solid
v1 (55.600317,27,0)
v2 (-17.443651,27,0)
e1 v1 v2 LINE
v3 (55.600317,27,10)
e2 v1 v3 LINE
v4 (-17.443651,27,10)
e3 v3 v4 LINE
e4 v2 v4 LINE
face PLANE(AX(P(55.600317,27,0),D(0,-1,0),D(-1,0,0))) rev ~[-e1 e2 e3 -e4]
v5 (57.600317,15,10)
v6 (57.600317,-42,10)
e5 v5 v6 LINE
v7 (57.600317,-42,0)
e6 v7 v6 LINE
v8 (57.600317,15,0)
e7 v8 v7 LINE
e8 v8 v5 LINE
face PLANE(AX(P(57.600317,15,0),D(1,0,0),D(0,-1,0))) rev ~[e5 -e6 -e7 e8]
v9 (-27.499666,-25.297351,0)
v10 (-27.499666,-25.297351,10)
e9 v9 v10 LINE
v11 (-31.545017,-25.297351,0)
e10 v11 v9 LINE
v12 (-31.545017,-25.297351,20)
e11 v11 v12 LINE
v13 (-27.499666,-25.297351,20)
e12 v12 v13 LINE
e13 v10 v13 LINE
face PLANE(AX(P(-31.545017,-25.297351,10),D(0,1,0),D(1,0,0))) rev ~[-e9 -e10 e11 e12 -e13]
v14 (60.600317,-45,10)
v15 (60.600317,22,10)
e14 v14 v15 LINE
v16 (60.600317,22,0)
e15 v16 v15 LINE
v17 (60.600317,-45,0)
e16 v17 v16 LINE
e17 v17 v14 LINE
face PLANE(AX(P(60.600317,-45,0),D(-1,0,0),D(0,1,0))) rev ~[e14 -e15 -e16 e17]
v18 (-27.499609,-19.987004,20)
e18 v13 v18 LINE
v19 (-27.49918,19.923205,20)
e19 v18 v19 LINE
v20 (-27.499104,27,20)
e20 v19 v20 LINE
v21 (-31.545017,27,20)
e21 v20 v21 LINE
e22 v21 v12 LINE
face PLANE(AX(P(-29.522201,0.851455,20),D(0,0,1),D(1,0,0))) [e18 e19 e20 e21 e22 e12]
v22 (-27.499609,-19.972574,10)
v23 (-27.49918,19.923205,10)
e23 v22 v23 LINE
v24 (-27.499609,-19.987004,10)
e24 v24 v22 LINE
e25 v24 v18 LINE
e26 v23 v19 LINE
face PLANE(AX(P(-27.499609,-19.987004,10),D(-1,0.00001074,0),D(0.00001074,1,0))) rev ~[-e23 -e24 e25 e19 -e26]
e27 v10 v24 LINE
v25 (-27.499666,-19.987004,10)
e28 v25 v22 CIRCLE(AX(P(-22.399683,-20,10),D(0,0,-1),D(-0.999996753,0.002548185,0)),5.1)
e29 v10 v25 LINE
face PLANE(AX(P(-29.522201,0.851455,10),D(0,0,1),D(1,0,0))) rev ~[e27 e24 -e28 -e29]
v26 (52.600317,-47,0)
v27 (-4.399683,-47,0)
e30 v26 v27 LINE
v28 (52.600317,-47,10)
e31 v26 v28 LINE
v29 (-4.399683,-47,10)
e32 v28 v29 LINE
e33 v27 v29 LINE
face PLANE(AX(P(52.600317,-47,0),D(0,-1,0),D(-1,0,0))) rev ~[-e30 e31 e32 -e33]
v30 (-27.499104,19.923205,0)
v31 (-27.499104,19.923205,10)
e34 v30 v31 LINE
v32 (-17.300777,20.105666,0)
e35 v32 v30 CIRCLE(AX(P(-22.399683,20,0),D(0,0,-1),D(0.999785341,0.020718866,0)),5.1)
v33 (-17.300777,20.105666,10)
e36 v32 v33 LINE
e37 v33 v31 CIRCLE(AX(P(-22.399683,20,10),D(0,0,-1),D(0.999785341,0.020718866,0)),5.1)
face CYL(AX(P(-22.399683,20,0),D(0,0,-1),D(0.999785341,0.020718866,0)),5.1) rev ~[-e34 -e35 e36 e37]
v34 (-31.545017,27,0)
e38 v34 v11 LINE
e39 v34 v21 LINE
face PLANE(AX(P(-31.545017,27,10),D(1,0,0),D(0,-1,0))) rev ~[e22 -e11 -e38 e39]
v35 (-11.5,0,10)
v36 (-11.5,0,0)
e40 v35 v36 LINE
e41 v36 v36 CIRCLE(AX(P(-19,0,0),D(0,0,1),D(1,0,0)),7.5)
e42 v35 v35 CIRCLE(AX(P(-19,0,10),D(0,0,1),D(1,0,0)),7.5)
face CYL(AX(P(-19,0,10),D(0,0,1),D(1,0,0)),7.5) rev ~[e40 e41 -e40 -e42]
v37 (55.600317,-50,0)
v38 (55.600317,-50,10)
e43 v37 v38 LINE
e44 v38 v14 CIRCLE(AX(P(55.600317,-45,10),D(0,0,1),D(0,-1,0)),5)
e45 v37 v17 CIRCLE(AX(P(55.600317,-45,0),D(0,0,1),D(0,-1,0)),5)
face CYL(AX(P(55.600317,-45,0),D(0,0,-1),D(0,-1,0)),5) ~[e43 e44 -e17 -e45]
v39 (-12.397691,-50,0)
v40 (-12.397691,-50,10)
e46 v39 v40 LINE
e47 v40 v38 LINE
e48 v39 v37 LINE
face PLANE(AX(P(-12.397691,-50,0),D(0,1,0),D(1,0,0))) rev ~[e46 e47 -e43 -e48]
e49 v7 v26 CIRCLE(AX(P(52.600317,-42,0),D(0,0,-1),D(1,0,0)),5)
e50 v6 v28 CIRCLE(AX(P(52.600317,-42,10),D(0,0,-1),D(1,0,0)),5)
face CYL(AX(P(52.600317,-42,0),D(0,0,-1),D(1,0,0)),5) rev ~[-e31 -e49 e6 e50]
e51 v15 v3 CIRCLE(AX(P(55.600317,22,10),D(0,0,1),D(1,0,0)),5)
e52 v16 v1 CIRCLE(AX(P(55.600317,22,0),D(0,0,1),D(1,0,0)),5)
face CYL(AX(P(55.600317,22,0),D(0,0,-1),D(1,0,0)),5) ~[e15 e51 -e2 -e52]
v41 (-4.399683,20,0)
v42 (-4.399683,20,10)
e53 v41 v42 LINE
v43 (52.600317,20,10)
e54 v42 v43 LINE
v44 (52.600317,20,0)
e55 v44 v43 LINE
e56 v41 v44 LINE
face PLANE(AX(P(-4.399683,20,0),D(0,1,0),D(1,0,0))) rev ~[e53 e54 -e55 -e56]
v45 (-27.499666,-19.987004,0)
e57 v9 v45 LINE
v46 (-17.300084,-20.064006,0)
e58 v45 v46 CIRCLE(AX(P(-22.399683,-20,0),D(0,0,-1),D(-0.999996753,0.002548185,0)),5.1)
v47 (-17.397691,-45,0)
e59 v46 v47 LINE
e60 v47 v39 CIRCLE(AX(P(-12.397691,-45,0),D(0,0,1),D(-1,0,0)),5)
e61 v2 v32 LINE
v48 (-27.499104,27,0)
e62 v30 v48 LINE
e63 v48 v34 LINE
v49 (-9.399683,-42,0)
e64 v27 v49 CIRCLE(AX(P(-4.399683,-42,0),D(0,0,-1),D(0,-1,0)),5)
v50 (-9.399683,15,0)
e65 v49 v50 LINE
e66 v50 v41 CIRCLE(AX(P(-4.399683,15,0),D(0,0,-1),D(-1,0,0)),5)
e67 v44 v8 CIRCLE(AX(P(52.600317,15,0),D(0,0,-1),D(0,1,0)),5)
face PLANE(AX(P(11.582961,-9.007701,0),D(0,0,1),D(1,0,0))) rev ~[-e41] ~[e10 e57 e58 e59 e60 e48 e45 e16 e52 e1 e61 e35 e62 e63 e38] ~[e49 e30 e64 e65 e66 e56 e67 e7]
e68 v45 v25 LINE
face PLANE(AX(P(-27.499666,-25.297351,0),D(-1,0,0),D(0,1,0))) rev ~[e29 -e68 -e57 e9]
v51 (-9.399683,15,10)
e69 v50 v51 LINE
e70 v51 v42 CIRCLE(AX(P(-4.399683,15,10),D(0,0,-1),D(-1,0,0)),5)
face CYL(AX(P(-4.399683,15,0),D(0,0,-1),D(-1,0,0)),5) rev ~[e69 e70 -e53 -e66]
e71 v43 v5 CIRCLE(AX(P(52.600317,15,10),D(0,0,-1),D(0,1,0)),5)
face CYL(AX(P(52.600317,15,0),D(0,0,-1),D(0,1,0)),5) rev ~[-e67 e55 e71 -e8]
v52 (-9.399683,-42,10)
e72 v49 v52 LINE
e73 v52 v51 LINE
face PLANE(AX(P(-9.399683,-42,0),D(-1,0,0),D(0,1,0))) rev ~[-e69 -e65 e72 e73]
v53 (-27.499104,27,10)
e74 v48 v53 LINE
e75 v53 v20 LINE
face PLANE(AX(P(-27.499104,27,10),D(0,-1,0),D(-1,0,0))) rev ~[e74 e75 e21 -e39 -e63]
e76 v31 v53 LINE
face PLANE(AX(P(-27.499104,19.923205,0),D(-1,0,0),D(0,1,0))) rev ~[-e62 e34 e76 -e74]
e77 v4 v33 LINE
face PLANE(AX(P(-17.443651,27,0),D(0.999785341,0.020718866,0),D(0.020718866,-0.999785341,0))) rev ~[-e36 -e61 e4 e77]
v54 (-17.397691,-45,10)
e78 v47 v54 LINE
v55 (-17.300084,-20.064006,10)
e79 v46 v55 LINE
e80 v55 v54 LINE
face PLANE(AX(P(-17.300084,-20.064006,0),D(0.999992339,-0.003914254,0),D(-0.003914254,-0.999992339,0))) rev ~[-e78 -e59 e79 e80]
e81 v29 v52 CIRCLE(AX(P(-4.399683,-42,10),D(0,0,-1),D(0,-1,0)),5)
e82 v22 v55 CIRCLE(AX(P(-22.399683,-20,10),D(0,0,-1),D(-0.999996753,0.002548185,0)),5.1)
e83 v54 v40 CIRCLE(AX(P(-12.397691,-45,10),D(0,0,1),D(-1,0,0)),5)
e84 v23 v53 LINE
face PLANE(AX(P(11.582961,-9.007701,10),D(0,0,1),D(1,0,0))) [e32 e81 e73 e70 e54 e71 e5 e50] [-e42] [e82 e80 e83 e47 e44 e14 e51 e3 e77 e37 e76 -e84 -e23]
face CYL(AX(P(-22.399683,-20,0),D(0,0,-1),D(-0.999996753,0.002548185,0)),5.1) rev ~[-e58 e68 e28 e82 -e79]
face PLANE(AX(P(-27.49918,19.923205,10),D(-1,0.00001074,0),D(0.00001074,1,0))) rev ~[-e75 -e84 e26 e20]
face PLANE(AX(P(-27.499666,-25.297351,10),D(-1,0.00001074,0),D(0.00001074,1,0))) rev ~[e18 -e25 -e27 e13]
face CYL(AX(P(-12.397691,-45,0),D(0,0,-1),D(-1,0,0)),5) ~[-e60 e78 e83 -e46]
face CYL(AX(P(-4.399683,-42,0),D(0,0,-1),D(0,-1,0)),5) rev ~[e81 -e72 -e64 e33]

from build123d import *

# Parameters (mm, degrees)
F1_DEPTH = 10
F3_DEPTH = 10
F2_R     = 7.5
F4_DEPTH = 25


# Not quite as in the source:
# - a feature names something its author has since deleted; it is built from what else it names


with BuildPart() as f1:
    # F0 (on Top) → F1 (new body)
    with BuildSketch(Plane.XY):
        with BuildLine():
            Line((-12.3976909148, -50), (55.6003173012, -50))
            ThreePointArc((55.6003173012, -50), (59.1358512071, -48.5355339059), (60.6003173012, -45))
            Line((60.6003173012, -45), (60.6003173012, 22))
            ThreePointArc((60.6003173012, 22), (59.1358512071, 25.5355339059), (55.6003173012, 27))
            Line((55.6003173012, 27), (-17.4436509052, 27))
            Line((-17.4436509052, 27), (-17.3007774584, 20.1056662166))
            ThreePointArc((-17.3007774584, 20.1056662166), (-22.3084516237, 14.9008160564), (-27.4991044794, 19.9232047976))
            Line((-27.4991044794, 19.9232047976), (-27.4991044794, 27))
            Line((-27.4991044794, 27), (-31.5450169146, 27))
            Line((-31.5450169146, 27), (-31.5450169146, -25.2973511815))
            Line((-31.5450169146, -25.2973511815), (-27.499666141, -25.2973511815))
            Line((-27.499666141, -25.2973511815), (-27.499666141, -19.9870042568))
            ThreePointArc((-27.499666141, -19.9870042568), (-22.3611815213, -14.9001453296), (-17.3000843541, -20.0640056487))
            Line((-17.3000843541, -20.0640056487), (-17.3976909148, -45))
            ThreePointArc((-17.3976909148, -45), (-15.9332248208, -48.5355339059), (-12.3976909148, -50))
        make_face()
        with BuildLine():
            ThreePointArc((52.6003173012, 20), (56.1358512071, 18.5355339059), (57.6003173012, 15))
            Line((57.6003173012, 15), (57.6003173012, -42))
            ThreePointArc((57.6003173012, -42), (56.1358512071, -45.5355339059), (52.6003173012, -47))
            Line((52.6003173012, -47), (-4.3996826988, -47))
            ThreePointArc((-4.3996826988, -47), (-7.9352166047, -45.5355339059), (-9.3996826988, -42))
            Line((-9.3996826988, -42), (-9.3996826988, 15))
            ThreePointArc((-9.3996826988, 15), (-7.9352166047, 18.5355339059), (-4.3996826988, 20))
            Line((-4.3996826988, 20), (52.6003173012, 20))
        make_face(mode=Mode.SUBTRACT)
    extrude(amount=F1_DEPTH)

    # F2 (on face) → F3 (join)
    with BuildSketch(Plane.XY.offset(10)):
        Polygon((-27.4991044794, 27), (-31.5450169146, 27), (-31.5450169146, -25.2973511815), (-27.499666141, -25.2973511815), (-27.4996091091, -19.9870042574), (-27.4991804826, 19.9232047984), align=None)
    extrude(amount=F3_DEPTH)

    # F2 (on face) → F4 (cut)
    with BuildSketch(Plane.XY.offset(10)):
        with Locations((-19, 0)):
            Circle(F2_R)
    extrude(amount=-F4_DEPTH, mode=Mode.SUBTRACT)


solid = f1.part
